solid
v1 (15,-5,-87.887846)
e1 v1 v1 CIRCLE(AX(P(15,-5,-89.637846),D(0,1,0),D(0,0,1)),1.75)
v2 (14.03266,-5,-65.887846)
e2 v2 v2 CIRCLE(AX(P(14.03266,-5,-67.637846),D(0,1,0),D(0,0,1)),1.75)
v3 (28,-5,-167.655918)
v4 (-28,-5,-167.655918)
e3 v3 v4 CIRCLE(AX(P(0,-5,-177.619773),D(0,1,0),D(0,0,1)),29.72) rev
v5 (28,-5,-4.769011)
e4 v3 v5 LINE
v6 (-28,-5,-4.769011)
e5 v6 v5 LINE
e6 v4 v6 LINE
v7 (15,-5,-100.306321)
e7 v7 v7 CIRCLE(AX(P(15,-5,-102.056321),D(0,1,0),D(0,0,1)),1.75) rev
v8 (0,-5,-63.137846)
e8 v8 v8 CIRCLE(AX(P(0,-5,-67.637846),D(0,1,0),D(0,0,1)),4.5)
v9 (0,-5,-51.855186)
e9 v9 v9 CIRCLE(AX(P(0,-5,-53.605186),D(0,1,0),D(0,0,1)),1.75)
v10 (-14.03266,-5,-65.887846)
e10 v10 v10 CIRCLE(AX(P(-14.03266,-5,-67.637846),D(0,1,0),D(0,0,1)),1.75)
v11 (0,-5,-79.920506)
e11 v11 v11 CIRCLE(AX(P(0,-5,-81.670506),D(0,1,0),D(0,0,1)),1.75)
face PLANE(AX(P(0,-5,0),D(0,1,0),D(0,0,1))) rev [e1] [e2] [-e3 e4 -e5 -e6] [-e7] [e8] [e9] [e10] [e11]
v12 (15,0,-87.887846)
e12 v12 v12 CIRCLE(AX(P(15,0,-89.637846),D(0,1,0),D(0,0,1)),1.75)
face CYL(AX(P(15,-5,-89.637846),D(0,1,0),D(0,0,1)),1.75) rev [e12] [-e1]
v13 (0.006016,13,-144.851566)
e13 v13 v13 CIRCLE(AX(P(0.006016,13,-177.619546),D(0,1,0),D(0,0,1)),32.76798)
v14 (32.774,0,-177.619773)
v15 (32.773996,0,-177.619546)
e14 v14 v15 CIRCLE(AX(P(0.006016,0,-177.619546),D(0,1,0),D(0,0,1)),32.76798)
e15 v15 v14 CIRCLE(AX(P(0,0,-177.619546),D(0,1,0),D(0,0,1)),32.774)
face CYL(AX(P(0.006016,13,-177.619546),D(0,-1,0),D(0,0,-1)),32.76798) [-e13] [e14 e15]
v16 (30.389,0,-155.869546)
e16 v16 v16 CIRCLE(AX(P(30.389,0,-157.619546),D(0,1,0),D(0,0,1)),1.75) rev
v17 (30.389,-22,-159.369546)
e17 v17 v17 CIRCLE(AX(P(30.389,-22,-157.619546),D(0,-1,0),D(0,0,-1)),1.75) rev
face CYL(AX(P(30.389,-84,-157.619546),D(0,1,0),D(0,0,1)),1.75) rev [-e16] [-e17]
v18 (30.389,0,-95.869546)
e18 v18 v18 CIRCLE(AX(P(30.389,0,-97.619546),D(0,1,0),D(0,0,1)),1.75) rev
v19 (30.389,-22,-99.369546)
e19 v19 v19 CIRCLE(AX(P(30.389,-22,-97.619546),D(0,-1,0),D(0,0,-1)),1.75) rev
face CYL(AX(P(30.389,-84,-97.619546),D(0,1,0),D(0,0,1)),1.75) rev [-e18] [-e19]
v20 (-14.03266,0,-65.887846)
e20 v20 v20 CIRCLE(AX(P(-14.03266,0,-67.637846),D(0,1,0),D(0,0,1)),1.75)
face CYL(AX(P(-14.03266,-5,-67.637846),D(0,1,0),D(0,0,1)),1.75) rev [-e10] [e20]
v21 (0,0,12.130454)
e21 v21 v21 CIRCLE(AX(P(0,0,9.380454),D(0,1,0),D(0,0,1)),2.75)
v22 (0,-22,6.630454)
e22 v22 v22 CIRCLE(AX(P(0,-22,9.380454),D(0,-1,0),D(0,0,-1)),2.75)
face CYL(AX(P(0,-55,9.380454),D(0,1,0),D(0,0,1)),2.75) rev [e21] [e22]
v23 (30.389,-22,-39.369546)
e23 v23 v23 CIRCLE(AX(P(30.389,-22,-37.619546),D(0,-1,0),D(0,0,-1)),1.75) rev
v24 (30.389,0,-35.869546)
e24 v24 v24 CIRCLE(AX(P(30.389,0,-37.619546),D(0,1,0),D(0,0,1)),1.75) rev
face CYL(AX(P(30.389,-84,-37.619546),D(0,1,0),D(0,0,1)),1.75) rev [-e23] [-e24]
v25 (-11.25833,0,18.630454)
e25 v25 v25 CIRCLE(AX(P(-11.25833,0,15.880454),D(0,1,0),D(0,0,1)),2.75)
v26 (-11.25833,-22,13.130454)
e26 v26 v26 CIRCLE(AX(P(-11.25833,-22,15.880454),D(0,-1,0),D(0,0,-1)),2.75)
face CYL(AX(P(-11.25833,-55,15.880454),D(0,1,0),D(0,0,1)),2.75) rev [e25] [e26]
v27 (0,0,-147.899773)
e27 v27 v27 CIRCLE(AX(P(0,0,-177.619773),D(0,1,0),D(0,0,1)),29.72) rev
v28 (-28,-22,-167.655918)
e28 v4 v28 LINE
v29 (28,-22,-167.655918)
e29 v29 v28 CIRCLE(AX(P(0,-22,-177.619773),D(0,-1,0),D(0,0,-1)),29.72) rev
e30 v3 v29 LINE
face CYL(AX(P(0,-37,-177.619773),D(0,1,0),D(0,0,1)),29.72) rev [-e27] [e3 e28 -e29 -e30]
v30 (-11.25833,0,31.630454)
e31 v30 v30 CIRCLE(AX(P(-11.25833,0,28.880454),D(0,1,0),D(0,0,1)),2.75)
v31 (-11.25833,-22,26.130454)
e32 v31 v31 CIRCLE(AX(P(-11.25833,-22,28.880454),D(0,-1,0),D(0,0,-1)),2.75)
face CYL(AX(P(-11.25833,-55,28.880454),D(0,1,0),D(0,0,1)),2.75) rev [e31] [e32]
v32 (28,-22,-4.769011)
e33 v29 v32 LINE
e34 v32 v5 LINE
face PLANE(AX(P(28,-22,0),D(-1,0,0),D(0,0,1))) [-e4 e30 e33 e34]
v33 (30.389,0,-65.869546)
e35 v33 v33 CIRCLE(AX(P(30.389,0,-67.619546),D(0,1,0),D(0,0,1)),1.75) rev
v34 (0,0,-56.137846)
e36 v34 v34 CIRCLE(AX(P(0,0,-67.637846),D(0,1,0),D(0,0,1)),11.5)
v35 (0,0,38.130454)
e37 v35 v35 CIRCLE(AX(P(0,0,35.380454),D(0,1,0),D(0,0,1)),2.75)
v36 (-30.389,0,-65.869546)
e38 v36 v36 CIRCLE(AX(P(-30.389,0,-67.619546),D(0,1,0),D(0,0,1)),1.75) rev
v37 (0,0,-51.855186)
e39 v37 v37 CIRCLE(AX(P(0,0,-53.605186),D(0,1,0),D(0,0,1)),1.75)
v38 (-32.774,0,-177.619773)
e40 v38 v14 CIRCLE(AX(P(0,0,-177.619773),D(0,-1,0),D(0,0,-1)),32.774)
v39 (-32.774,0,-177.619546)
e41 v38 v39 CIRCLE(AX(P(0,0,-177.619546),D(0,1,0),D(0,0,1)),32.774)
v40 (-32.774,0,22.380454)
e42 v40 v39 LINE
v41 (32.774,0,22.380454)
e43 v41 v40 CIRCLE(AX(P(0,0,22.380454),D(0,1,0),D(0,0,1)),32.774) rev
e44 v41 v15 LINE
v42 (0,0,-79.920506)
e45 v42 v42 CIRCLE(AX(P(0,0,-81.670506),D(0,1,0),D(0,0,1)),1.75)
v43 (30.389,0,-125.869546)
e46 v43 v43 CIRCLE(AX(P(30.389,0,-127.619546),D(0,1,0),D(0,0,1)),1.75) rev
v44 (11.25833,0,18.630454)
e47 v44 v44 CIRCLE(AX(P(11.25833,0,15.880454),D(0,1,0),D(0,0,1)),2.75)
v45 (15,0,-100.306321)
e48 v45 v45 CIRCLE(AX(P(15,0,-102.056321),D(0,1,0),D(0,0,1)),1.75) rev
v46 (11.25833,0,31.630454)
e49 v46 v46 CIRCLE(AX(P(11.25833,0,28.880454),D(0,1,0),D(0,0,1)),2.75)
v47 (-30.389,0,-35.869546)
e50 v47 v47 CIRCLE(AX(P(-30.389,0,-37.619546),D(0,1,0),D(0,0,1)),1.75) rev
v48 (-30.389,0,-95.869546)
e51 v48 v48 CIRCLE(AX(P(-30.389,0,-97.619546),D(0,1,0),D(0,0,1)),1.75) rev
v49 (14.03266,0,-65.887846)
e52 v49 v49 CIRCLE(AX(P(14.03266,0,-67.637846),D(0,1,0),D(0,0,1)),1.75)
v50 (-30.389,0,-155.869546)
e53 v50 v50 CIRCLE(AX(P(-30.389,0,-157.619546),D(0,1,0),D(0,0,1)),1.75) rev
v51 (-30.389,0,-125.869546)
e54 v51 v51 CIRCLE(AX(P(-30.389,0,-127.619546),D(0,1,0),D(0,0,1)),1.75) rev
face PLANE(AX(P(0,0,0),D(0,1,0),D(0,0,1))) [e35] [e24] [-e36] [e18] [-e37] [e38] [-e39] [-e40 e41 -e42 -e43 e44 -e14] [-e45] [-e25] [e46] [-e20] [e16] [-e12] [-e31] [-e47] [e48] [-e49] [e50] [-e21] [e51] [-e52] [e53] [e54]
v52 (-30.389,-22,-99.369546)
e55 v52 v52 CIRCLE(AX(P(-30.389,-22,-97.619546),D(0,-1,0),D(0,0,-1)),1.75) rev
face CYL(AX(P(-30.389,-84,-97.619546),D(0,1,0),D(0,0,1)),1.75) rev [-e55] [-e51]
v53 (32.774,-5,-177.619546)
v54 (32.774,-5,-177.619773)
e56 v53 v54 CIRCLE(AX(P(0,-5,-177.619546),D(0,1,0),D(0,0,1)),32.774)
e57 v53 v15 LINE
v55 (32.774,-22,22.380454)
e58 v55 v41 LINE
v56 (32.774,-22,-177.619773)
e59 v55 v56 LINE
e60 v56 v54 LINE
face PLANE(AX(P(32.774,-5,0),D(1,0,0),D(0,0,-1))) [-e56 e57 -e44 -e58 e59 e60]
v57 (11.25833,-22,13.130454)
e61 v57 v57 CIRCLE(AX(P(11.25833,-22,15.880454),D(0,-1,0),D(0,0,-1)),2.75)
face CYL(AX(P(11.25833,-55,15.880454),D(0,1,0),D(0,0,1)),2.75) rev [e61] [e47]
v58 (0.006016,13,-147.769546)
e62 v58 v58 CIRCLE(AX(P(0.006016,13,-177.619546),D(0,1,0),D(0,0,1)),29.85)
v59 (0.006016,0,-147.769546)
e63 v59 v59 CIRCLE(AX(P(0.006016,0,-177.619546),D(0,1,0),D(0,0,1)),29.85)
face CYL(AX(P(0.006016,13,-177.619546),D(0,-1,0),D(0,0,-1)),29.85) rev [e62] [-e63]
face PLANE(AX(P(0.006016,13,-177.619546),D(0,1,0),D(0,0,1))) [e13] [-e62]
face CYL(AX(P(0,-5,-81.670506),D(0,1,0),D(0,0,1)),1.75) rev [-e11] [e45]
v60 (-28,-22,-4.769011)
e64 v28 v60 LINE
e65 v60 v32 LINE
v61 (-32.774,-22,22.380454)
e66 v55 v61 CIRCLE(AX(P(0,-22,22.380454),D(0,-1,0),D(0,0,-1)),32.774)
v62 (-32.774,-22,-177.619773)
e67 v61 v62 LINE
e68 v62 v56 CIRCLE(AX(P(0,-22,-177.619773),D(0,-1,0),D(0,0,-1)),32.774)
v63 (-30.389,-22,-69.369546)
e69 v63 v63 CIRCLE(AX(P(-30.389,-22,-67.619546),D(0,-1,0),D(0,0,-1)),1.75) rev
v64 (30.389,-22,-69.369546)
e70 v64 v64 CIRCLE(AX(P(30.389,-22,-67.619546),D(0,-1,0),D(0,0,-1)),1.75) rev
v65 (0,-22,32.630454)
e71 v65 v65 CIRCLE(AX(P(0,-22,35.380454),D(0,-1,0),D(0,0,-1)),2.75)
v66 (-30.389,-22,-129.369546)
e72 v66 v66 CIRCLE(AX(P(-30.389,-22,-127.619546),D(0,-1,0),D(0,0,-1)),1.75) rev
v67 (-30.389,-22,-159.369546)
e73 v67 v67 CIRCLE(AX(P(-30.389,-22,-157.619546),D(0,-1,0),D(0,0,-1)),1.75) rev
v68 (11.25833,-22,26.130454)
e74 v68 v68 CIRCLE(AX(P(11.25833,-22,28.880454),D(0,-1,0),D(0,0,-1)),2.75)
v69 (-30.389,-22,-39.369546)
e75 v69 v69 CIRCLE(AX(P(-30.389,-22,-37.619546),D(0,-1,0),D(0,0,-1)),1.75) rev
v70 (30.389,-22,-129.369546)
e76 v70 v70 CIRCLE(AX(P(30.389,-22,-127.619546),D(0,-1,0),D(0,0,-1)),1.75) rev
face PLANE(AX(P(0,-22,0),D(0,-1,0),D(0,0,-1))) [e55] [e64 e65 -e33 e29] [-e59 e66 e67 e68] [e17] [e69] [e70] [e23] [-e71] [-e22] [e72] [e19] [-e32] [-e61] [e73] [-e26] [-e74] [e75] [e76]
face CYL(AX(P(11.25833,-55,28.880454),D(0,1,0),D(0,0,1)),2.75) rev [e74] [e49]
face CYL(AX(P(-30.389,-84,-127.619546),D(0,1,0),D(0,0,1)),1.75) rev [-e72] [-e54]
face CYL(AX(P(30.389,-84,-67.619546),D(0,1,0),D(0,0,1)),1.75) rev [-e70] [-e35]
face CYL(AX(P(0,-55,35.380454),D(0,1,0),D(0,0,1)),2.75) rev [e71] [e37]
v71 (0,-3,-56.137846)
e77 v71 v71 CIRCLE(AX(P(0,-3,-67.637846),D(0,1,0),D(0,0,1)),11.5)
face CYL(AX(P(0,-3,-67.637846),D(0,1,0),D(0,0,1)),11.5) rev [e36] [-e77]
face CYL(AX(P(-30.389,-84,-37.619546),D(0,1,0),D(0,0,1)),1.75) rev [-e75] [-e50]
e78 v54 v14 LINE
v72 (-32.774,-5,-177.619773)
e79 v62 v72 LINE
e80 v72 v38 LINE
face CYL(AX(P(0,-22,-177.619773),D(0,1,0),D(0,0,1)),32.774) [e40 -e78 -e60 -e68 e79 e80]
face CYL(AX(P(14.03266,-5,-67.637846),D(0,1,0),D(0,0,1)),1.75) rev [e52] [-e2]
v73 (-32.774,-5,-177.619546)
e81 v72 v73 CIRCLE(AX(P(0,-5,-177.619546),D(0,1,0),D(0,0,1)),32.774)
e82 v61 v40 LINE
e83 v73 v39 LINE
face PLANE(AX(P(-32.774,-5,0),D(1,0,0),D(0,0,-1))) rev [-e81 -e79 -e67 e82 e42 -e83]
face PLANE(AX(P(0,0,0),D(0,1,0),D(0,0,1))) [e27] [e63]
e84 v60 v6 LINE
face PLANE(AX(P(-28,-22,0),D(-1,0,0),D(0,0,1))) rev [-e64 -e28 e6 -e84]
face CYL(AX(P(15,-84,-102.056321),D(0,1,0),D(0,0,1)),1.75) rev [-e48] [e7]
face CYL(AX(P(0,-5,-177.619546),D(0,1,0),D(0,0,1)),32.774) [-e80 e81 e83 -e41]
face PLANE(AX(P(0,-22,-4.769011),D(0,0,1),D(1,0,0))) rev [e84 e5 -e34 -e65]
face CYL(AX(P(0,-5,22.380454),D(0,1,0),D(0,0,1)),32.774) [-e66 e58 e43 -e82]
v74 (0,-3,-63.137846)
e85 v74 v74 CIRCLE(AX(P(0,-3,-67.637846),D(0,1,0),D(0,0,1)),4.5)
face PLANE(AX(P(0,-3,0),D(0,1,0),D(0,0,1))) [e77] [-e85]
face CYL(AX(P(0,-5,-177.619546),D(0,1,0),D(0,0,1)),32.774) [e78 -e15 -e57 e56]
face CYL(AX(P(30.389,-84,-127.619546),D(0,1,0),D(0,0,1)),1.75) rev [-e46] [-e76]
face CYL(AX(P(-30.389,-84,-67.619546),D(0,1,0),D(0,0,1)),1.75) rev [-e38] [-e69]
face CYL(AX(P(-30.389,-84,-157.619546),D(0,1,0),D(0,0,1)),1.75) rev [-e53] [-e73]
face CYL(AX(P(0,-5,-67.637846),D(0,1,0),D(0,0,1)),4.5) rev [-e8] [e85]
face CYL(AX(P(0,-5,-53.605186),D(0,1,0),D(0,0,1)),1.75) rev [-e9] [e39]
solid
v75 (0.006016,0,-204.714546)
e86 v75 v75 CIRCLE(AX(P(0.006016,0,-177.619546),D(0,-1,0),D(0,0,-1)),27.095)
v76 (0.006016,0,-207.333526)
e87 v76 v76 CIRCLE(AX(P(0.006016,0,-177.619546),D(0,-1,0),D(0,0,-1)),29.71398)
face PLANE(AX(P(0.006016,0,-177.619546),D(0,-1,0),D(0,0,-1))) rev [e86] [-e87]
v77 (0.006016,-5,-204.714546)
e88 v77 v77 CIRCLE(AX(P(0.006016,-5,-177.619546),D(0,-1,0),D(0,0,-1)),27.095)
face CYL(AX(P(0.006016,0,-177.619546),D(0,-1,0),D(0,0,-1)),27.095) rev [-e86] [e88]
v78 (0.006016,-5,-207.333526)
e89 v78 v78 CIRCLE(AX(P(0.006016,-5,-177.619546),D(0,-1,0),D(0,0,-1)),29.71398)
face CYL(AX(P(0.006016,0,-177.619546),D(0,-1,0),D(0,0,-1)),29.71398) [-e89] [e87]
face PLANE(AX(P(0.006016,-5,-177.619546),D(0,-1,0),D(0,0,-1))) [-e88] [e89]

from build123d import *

# Parameters (mm, degrees)
SKETCH1_R               = 2.75
SKETCH1_R_2             = 1.25
SKETCH1_R_3             = 1.75
SKETCH1_R_4             = 4.5
BOSS_EXTRUDE10_DEPTH    = 5
BOSS_EXTRUDE9_DEPTH     = 22
SKETCH1_14_R            = 11.5
SKETCH1_14_R_2          = 4.5
CUT_EXTRUDE3_DEPTH      = 3
SKETCH1_16_R            = 1.25
BOSS_EXTRUDE11_DEPTH    = 5
BOSS_EXTRUDE12_DEPTH    = 22
SKETCH1_17_R            = 2.75
CUT_EXTRUDE4_DEPTH      = 55
CUT_EXTRUDE5_DEPTH      = 79
CUT_EXTRUDE5_DEPTH_BACK = 21
SKETCH3_R               = 1.75
CUT_EXTRUDE6_DEPTH      = 32
CUT_EXTRUDE6_DEPTH_BACK = 62
SKETCH7_R               = 29.72
SKETCH8_R               = 29.71398012
SKETCH8_R_2             = 27.095
BOSS_EXTRUDE13_DEPTH    = 5
SKETCH9_R               = 32.767980119
SKETCH9_R_2             = 29.85
BOSS_EXTRUDE14_DEPTH    = 13


with BuildPart() as part:
    # Sketch1 → Boss-Extrude10 (new body)
    with BuildSketch(Plane(origin=(0, 0, 0), x_dir=(1, 0, 0), z_dir=(0, 1, 0))):
        with BuildLine():
            Line((-32.774, 177.619546288), (-32.774, -22.380453712))
            ThreePointArc((-32.774, -22.380453712), (0, -55.154453712), (32.774, -22.380453712))
            Line((32.774, -22.380453712), (32.774, 177.619546288))
            ThreePointArc((32.774, 177.619546288), (0, 210.393546288), (-32.774, 177.619546288))
        make_face()
        with Locations((-11.258330249, -28.880453712)):
            Circle(SKETCH1_R, mode=Mode.SUBTRACT)
        with Locations((-11.258330249, -15.880453712)):
            Circle(SKETCH1_R, mode=Mode.SUBTRACT)
        with Locations((-6.733414, 27.619546288)):
            Circle(SKETCH1_R_2, mode=Mode.SUBTRACT)
        with Locations((-6.733414, 37.119546288)):
            Circle(SKETCH1_R_2, mode=Mode.SUBTRACT)
        with Locations((-14.032659813, 67.637846288)):
            Circle(SKETCH1_R_3, mode=Mode.SUBTRACT)
        with Locations((0, -35.380453712)):
            Circle(SKETCH1_R, mode=Mode.SUBTRACT)
        with Locations((11.258330249, -28.880453712)):
            Circle(SKETCH1_R, mode=Mode.SUBTRACT)
        with Locations((0, -9.380453712)):
            Circle(SKETCH1_R, mode=Mode.SUBTRACT)
        with Locations((11.258330249, -15.880453712)):
            Circle(SKETCH1_R, mode=Mode.SUBTRACT)
        with Locations((0, 53.605186475)):
            Circle(SKETCH1_R_3, mode=Mode.SUBTRACT)
        with Locations((14.032659813, 67.637846288)):
            Circle(SKETCH1_R_3, mode=Mode.SUBTRACT)
        with Locations((0, 81.6705061)):
            Circle(SKETCH1_R_3, mode=Mode.SUBTRACT)
        with Locations((15, 89.637846288)):
            Circle(SKETCH1_R_3, mode=Mode.SUBTRACT)
        with Locations((0, 177.619546288)):
            Circle(SKETCH1_R_4, mode=Mode.SUBTRACT)
        with Locations((0, 67.637846288)):
            Circle(SKETCH1_R_4, mode=Mode.SUBTRACT)
    extrude(amount=-BOSS_EXTRUDE10_DEPTH)

    # Sketch2 → Boss-Extrude9 (add)
    with BuildSketch(Plane.XZ):
        with BuildLine():
            ThreePointArc((32.774000001, 22.380453712), (0, 55.154453713), (-32.774000001, 22.380453712))
            Line((-32.774000001, 22.380453712), (-32.774000001, -177.619773144))
            ThreePointArc((-32.774000001, -177.619773144), (0, -210.393773145), (32.774000001, -177.619773144))
            Line((32.774000001, -177.619773144), (32.774000001, 22.380453712))
        make_face()
        with BuildLine():
            Line((28, -97.619319431), (28, -177.619773144))
            ThreePointArc((28, -177.619773144), (0, -205.619773144), (-28, -177.619773144))
            Line((-28, -177.619773144), (-28, -97.62))
            Line((-28, -97.62), (-28, -4.769011255))
            Line((-28, -4.769011255), (-28, 22.380453712))
            ThreePointArc((-28, 22.380453712), (0, 50.380453712), (28, 22.380453712))
            Line((28, 22.380453712), (28, -4.769011255))
            Line((28, -4.769011255), (28, -97.619319431))
        make_face(mode=Mode.SUBTRACT)
    extrude(amount=BOSS_EXTRUDE9_DEPTH)

    # Sketch1<14> → Cut-Extrude3 (cut)
    with BuildSketch(Plane(origin=(0, 0, 0), x_dir=(1, 0, 0), z_dir=(0, 1, 0))):
        with Locations((0, 67.637846288)):
            Circle(SKETCH1_14_R)
        with Locations((0, 67.637846288)):
            Circle(SKETCH1_14_R_2, mode=Mode.SUBTRACT)
    extrude(amount=-CUT_EXTRUDE3_DEPTH, mode=Mode.SUBTRACT)

    # Sketch1<16> → Boss-Extrude11 (add)
    with BuildSketch(Plane(origin=(0, 0, 0), x_dir=(1, 0, 0), z_dir=(0, 1, 0))):
        with Locations((-6.733414, 37.119546288)):
            Circle(SKETCH1_16_R)
        with Locations((-6.733414, 27.619546288)):
            Circle(SKETCH1_16_R)
    extrude(amount=-BOSS_EXTRUDE11_DEPTH)

    # Sketch2<13> → Boss-Extrude12 (add)
    with BuildSketch(Plane.XZ):
        with BuildLine():
            Line((-28, -4.769011255), (28, -4.769011255))
            Line((28, -4.769011255), (28, 22.380453712))
            ThreePointArc((28, 22.380453712), (0, 50.380453712), (-28, 22.380453712))
            Line((-28, 22.380453712), (-28, -4.769011255))
        make_face()
    extrude(amount=BOSS_EXTRUDE12_DEPTH)

    # Sketch1<17> → Cut-Extrude4 (cut)
    with BuildSketch(Plane(origin=(0, 0, 0), x_dir=(1, 0, 0), z_dir=(0, 1, 0))):
        with Locations((0, -9.380453712)):
            Circle(SKETCH1_17_R)
        with Locations((11.258330249, -15.880453712)):
            Circle(SKETCH1_17_R)
        with Locations((11.258330249, -28.880453712)):
            Circle(SKETCH1_17_R)
        with Locations((0, -35.380453712)):
            Circle(SKETCH1_17_R)
        with Locations((-11.258330249, -28.880453712)):
            Circle(SKETCH1_17_R)
        with Locations((-11.258330249, -15.880453712)):
            Circle(SKETCH1_17_R)
    extrude(amount=-CUT_EXTRUDE4_DEPTH, mode=Mode.SUBTRACT)

    # Sketch3 → Cut-Extrude5 (cut, two sides: drawn at the far end of the back side and taken through both)
    with BuildSketch(Plane.XZ.offset(5).offset(-CUT_EXTRUDE5_DEPTH_BACK)):
        with Locations((15, -89.637846288)):
            Circle(SKETCH3_R)
        with Locations((15, -102.056321071)):
            Circle(SKETCH3_R)
        with Locations((-30.389000001, -97.619546288)):
            Circle(SKETCH3_R)
        with Locations((30.389000001, -37.619546288)):
            Circle(SKETCH3_R)
        with Locations((-30.389000001, -37.619546288)):
            Circle(SKETCH3_R)
        with Locations((-30.389000001, -67.619546288)):
            Circle(SKETCH3_R)
        with Locations((-30.389000001, -127.619546288)):
            Circle(SKETCH3_R)
        with Locations((-30.389000001, -157.619546288)):
            Circle(SKETCH3_R)
        with Locations((30.389000001, -157.619546288)):
            Circle(SKETCH3_R)
        with Locations((30.389000001, -127.619546288)):
            Circle(SKETCH3_R)
        with Locations((30.389000001, -67.619546288)):
            Circle(SKETCH3_R)
        with Locations((30.389000001, -97.619546288)):
            Circle(SKETCH3_R)
    extrude(amount=CUT_EXTRUDE5_DEPTH + CUT_EXTRUDE5_DEPTH_BACK, mode=Mode.SUBTRACT)

    # Sketch7 → Cut-Extrude6 (cut, two sides: drawn at the far end of the back side and taken through both)
    with BuildSketch(Plane.XZ.offset(5).offset(-CUT_EXTRUDE6_DEPTH_BACK)):
        with Locations((0, -177.619773144)):
            Circle(SKETCH7_R)
    extrude(amount=CUT_EXTRUDE6_DEPTH + CUT_EXTRUDE6_DEPTH_BACK, mode=Mode.SUBTRACT)

    # Sketch9 → Boss-Extrude14 (add)
    with BuildSketch(Plane(origin=(0, 0, 0), x_dir=(1, 0, 0), z_dir=(0, 1, 0))):
        with Locations((0.006015604, 177.619546288)):
            Circle(SKETCH9_R)
        with Locations((0.006015604, 177.619546288)):
            Circle(SKETCH9_R_2, mode=Mode.SUBTRACT)
    extrude(amount=BOSS_EXTRUDE14_DEPTH)


with BuildPart() as body_2:
    # Sketch8 → Boss-Extrude13 (new body)
    with BuildSketch(Plane.XZ.offset(5)):
        with Locations((0.006015604, -177.619546288)):
            Circle(SKETCH8_R)
        with Locations((0.006015604, -177.619546288)):
            Circle(SKETCH8_R_2, mode=Mode.SUBTRACT)
    extrude(amount=-BOSS_EXTRUDE13_DEPTH)


solid = Compound([part.part, body_2.part])
